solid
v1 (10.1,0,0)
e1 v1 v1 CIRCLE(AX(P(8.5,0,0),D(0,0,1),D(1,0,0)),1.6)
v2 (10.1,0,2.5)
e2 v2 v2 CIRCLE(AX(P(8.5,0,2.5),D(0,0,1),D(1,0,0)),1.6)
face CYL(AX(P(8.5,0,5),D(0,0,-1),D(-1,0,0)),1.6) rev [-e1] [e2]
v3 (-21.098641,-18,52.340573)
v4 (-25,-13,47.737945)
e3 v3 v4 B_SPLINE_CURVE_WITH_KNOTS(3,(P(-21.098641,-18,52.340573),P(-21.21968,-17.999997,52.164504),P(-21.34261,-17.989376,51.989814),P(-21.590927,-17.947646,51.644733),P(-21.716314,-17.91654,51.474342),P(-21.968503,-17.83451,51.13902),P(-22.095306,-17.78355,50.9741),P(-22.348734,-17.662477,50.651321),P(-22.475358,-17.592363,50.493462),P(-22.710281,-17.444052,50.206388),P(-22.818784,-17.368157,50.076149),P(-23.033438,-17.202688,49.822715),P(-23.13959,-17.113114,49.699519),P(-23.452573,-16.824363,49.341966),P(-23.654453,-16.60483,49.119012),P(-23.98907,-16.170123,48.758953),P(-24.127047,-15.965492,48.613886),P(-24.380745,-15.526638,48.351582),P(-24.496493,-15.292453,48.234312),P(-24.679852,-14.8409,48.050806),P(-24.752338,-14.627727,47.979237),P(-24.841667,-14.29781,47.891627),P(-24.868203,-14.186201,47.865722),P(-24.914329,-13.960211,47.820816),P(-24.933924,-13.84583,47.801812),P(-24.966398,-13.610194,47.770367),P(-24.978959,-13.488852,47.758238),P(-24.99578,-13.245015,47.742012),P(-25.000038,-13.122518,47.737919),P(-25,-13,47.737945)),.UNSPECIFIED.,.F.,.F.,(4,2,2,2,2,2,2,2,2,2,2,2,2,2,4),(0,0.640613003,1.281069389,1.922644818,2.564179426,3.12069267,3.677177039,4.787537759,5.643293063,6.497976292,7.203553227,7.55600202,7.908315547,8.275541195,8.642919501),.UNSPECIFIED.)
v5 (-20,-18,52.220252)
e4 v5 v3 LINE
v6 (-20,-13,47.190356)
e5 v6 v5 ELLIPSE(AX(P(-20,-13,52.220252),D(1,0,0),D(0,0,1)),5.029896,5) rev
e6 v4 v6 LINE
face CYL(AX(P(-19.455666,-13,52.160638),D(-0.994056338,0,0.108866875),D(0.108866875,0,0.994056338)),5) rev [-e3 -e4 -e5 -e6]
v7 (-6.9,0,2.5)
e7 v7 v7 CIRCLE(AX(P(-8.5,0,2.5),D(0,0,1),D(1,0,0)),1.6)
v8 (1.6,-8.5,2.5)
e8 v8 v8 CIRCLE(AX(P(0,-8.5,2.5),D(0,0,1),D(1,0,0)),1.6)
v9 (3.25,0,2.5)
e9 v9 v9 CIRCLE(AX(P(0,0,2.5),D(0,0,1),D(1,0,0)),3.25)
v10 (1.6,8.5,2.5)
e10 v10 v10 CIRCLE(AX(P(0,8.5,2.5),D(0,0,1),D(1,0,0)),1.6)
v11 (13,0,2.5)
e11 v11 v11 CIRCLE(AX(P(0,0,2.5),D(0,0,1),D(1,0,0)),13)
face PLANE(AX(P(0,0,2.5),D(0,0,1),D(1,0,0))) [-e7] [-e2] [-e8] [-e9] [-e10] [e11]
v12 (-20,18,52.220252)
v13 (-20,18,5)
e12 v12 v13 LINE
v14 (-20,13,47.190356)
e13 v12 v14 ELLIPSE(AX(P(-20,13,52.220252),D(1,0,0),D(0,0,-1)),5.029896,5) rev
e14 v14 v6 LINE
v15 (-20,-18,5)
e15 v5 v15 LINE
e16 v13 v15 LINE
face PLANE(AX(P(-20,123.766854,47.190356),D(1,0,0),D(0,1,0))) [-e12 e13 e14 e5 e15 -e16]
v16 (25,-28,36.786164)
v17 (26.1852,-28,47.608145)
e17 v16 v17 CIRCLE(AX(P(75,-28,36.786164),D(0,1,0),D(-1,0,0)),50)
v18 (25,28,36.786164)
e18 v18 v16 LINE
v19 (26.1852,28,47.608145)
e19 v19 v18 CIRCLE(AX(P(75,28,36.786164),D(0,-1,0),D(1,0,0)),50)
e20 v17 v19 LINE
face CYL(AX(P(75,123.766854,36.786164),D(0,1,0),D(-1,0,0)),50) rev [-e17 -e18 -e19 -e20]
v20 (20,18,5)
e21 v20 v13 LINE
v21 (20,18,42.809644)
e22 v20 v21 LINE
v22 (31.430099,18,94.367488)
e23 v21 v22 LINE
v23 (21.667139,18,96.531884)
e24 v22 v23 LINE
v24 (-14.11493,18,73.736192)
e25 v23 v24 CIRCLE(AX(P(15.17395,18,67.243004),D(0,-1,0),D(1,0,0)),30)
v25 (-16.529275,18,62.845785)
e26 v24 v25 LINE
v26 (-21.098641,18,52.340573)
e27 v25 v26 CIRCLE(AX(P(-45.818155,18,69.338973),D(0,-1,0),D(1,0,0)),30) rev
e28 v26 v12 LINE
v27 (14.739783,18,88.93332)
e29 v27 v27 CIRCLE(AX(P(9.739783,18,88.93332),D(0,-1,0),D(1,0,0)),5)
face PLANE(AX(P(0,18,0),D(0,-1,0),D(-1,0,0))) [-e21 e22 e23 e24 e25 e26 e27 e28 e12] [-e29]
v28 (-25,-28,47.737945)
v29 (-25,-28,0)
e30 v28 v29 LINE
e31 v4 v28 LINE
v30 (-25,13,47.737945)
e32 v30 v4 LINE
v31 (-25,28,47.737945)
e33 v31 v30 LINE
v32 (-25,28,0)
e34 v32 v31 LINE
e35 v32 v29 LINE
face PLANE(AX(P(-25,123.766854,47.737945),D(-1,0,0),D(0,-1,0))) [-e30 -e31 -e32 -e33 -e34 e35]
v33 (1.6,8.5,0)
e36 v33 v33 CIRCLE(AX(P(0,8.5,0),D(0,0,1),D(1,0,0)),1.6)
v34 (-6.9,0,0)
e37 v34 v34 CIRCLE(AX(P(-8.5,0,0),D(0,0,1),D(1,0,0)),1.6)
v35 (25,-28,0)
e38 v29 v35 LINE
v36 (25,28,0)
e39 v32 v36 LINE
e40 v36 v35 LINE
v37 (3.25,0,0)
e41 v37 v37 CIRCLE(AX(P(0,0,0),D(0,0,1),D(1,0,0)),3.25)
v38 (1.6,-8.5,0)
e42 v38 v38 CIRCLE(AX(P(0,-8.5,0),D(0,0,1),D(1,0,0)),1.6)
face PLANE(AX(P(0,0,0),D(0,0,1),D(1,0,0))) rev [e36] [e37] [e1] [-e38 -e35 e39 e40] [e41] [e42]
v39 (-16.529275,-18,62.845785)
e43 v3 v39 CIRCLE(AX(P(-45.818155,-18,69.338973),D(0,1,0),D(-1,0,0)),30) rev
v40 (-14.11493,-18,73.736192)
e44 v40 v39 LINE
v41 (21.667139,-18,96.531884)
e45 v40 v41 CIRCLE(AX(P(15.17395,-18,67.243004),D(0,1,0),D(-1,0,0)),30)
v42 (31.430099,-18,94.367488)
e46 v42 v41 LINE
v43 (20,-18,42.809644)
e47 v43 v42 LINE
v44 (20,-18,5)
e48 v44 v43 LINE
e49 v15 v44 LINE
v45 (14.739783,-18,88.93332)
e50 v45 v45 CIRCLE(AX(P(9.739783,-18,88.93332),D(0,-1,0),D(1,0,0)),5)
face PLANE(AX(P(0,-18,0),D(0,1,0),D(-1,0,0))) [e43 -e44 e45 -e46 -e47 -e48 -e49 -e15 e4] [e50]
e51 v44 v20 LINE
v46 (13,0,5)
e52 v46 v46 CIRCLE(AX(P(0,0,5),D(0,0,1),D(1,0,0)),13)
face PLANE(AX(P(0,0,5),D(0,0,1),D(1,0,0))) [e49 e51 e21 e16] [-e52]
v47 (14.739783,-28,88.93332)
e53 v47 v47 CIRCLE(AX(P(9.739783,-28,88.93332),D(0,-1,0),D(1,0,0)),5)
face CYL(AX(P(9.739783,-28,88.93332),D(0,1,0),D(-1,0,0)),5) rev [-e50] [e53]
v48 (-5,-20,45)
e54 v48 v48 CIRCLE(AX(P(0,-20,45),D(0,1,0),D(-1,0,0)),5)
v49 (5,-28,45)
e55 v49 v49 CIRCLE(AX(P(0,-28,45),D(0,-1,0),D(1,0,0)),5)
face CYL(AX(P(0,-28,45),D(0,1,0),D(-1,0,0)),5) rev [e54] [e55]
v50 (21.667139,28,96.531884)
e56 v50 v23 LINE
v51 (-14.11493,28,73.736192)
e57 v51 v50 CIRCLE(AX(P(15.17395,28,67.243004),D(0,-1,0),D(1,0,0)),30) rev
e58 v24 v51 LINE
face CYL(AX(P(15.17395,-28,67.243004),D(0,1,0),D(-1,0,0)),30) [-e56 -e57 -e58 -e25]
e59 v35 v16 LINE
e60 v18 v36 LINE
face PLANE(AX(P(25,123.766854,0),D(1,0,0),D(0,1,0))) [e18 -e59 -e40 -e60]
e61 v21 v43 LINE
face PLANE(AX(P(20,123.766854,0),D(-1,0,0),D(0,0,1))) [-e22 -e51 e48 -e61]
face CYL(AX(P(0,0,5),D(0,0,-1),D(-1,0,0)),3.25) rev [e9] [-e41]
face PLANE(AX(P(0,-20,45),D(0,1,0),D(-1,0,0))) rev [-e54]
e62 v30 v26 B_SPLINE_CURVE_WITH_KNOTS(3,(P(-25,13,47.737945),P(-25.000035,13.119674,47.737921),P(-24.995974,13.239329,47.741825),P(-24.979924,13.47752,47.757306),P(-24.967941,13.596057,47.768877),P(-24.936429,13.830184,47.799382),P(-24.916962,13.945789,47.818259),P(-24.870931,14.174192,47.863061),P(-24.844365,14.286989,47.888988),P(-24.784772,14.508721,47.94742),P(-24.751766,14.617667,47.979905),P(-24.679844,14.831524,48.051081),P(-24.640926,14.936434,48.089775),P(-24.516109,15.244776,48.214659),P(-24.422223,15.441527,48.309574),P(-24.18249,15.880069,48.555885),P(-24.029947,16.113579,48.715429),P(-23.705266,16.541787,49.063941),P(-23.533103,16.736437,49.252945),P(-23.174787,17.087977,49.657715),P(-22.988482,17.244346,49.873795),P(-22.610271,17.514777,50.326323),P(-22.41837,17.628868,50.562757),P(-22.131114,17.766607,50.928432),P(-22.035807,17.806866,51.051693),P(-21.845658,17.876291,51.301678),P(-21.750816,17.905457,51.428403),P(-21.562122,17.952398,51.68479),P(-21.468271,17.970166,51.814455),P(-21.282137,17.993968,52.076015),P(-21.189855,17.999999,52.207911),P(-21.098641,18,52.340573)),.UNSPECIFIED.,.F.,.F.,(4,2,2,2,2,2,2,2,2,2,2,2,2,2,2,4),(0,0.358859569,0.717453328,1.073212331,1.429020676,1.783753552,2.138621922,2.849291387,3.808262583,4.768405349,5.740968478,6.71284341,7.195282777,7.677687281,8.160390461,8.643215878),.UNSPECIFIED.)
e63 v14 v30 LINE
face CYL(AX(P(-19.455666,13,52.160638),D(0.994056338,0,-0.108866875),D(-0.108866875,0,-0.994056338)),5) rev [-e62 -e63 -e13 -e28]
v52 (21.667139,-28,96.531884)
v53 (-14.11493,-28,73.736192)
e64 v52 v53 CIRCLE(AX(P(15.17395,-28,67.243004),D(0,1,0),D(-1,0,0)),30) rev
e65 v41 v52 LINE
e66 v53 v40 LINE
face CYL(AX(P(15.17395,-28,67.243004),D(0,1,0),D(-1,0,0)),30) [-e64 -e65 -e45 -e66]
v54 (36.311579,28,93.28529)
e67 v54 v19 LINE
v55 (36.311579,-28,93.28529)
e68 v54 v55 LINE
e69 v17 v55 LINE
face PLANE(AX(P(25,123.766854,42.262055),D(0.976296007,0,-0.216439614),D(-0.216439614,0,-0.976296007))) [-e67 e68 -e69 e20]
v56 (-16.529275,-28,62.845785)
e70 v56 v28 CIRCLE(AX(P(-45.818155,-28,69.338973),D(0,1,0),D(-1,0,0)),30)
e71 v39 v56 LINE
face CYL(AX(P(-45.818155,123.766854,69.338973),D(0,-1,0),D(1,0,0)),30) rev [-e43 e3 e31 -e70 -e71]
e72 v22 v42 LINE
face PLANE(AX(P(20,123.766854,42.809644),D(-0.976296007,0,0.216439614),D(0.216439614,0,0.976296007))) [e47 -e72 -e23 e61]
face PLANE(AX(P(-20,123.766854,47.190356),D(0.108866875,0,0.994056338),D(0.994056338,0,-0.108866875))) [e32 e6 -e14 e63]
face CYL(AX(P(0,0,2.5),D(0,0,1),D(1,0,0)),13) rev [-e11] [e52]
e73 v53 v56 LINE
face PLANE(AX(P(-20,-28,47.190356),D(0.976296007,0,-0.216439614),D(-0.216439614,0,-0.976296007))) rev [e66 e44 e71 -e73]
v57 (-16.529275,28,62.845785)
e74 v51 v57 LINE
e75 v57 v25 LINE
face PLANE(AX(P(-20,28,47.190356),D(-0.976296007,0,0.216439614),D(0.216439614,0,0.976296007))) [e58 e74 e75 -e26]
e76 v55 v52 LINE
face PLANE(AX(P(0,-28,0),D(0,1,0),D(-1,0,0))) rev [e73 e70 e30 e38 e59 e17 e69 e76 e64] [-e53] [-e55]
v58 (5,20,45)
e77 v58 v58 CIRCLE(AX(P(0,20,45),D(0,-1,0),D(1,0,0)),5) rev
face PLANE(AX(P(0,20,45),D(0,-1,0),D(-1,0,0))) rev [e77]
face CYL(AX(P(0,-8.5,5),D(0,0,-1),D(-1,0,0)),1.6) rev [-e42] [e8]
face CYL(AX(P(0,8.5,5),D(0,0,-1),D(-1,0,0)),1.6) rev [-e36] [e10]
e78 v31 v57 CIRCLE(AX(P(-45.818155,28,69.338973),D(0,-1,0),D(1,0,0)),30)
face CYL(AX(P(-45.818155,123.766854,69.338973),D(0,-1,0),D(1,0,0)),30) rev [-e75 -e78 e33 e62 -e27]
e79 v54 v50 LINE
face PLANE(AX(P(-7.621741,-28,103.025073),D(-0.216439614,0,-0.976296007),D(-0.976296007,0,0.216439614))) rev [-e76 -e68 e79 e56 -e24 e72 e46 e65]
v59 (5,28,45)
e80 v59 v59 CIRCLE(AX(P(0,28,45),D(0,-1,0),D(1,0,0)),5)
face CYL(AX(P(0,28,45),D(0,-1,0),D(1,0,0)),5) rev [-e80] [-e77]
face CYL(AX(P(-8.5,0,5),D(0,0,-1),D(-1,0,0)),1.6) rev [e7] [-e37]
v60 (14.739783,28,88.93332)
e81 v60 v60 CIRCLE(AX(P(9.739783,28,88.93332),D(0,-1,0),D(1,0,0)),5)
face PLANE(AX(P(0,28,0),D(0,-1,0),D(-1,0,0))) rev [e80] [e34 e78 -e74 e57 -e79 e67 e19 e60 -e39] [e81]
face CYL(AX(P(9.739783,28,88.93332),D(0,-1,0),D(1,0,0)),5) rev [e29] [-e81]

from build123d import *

# Parameters (mm, degrees)
SKETCH_1_W          = 40
SKETCH_1_H          = 36
SKETCH_1_R          = 1.6
SKETCH_1_R_2        = 3.25
EXTRUDE_1_DEPTH     = 5
SKETCH_2_R          = 13
CUT_EXTRUDE_1_DEPTH = 2.5
SKETCH_7_R          = 5
EXTRUDE_2_DEPTH     = 10
SKETCH_10_R         = 5
EXTRUDE_4_DEPTH     = 2
EXTRUDE_3_REACH     = 123.4
FILLET_1_R          = 30
FILLET_2_R          = 50
FILLET_6_R          = 5


with BuildPart() as part:
    # ｽｹｯﾁ1 → ﾎﾞｽ - 押し出し1 (new body)
    with BuildSketch(Plane.XY):
        Rectangle(SKETCH_1_W, SKETCH_1_H)
        with Locations((0, 8.5)):
            Circle(SKETCH_1_R, mode=Mode.SUBTRACT)
        with Locations((8.5, 0)):
            Circle(SKETCH_1_R, mode=Mode.SUBTRACT)
        with Locations((0, -8.5)):
            Circle(SKETCH_1_R, mode=Mode.SUBTRACT)
        with Locations((-8.5, 0)):
            Circle(SKETCH_1_R, mode=Mode.SUBTRACT)
        Circle(SKETCH_1_R_2, mode=Mode.SUBTRACT)
    extrude(amount=EXTRUDE_1_DEPTH)

    # ｽｹｯﾁ2 → ｶｯﾄ - 押し出し1 (cut)
    with BuildSketch(Plane.XY.offset(5)):
        Circle(SKETCH_2_R)
    extrude(amount=-CUT_EXTRUDE_1_DEPTH, mode=Mode.SUBTRACT)

    # ｽｹｯﾁ7 → ﾎﾞｽ - 押し出し2 (add)
    with BuildSketch(Plane.XZ.offset(18)):
        Polygon((-20, 0), (-20, 47.190356234), (-7.621741376, 103.02507267), (31.430098909, 94.367488113), (20, 42.809643766), (20, 0), align=None)
        with Locations((0, 45)):
            Circle(SKETCH_7_R, mode=Mode.SUBTRACT)
        with Locations((9.739782627, 88.93332032)):
            Circle(SKETCH_7_R, mode=Mode.SUBTRACT)
    extrude_2 = extrude(amount=EXTRUDE_2_DEPTH)

    # ｽｹｯﾁ10 → ﾎﾞｽ - 押し出し4 (add)
    with BuildSketch(Plane(origin=(0, -18, 0), x_dir=(1, 0, 0), z_dir=(0, 1, 0))):
        with Locations(Location((0, -45, 0), (0, 0, 180))):
            Circle(SKETCH_10_R)
    extrude_4 = extrude(amount=-EXTRUDE_4_DEPTH)

    # ﾐﾗｰ3: ﾎﾞｽ - 押し出し2, ﾎﾞｽ - 押し出し4 across plane
    add(extrude_2.mirror(Plane.ZX))
    add(extrude_4.mirror(Plane.ZX))

    # ﾎﾞｽ - 押し出し3: up to this face of the body (flat: up to its plane)
    extrude_3_end = Plane(part.part.faces().sort_by_distance((-18.848513106, 28, 23.595178117))[0])
    # ｽｹｯﾁ8 → ﾎﾞｽ - 押し出し3 (add, up to the picked face)
    with BuildSketch(Plane.XZ.offset(28), mode=Mode.PRIVATE) as extrude_3_sk1:
        Polygon((-20, 47.190356234), (-20, 0), (-25, 0), (-25, 47.737945292), align=None)
    extrude_3_tool1 = split(extrude(extrude_3_sk1.sketch, amount=-EXTRUDE_3_REACH, mode=Mode.PRIVATE), bisect_by=extrude_3_end, keep=Keep.BOTH, mode=Mode.PRIVATE)
    # ｽｹｯﾁ8 → ﾎﾞｽ - 押し出し3 (add, up to the picked face)
    with BuildSketch(Plane.XZ.offset(28), mode=Mode.PRIVATE) as extrude_3_sk2:
        Polygon((20, 42.809643766), (31.430098909, 94.367488113), (36.311578945, 93.285290043), (25, 42.262054708), (25, 0), (20, 0), align=None)
    extrude_3_tool2 = split(extrude(extrude_3_sk2.sketch, amount=-EXTRUDE_3_REACH, mode=Mode.PRIVATE), bisect_by=extrude_3_end, keep=Keep.BOTH, mode=Mode.PRIVATE)
    add(extrude_3_tool1.solids().sort_by(Axis((-22.504807, -28, 23.732339), (0, 1, 0)))[0])
    add(extrude_3_tool2.solids().sort_by(Axis((25.636945, -28, 47.192298), (0, 1, 0)))[0])

    # ﾌｨﾚｯﾄ1
    # the kernel refuses this fillet: 30 mm, written as the material it adds along each edge
    with BuildSketch(Plane(origin=(-20, 22.088837233, 47.190356234), x_dir=(0.2164396139380964, 0, 0.9762960071199349), z_dir=(0, -1, 0))) as fillet_1_piece_1_section:
        with BuildLine():
            CenterArc((16.035534893, 30), FILLET_1_R, 236.442690238, 33.557309762)
            Line((-0.547589058, 5), (0, 0))
            Line((0, 0), (16.035534893, 0))
        make_face()
    fillet_1_piece_1 = extrude(amount=90.177674467, mode=Mode.PRIVATE)
    fillet_1_piece_1 = split(fillet_1_piece_1, bisect_by=Plane(origin=(-20, 18, 47.190356234), z_dir=(0, 1, 0)), keep=Keep.TOP, mode=Mode.PRIVATE)
    add(fillet_1_piece_1)
    with BuildSketch(Plane(origin=(-20, -18, 47.190356234), x_dir=(0.2164396139380964, 0, 0.9762960071199349), z_dir=(0, -1, 0))) as fillet_1_piece_2:
        with BuildLine():
            CenterArc((16.035534893, 30), FILLET_1_R, 236.442690238, 33.557309762)
            Line((-0.547589058, 5), (0, 0))
            Line((0, 0), (16.035534893, 0))
        make_face()
    extrude(amount=10)
    with BuildSketch(Plane(origin=(-20, -22.088837233, 47.190356234), x_dir=(-0.9940563382222736, 0, 0.10886687485238501), z_dir=(0, 1, 0))) as fillet_1_piece_3_section:
        with BuildLine():
            CenterArc((28.075951576, 19.206231343), FILLET_1_R, 186.25, 33.557309762)
            Line((-1.74573857, 15.940225098), (0, 0))
            Line((0, 0), (5.029896001, 0))
        make_face()
    fillet_1_piece_3 = extrude(amount=90.177674467, mode=Mode.PRIVATE)
    fillet_1_piece_3 = split(fillet_1_piece_3, bisect_by=Plane(origin=(-20, -18, 47.190356234), z_dir=(0, -1, 0)), keep=Keep.TOP, mode=Mode.PRIVATE)
    add(fillet_1_piece_3)
    with BuildSketch(Plane(origin=(-20, 18, 47.190356234), x_dir=(-0.9940563382222736, 0, 0.10886687485238501), z_dir=(0, 1, 0))) as fillet_1_piece_4:
        with BuildLine():
            CenterArc((28.075951576, 19.206231343), FILLET_1_R, 186.25, 33.557309762)
            Line((-1.74573857, 15.940225098), (0, 0))
            Line((0, 0), (5.029896001, 0))
        make_face()
    extrude(amount=10)
    # the kernel refuses this fillet: 30 mm, written as the material it takes off along each edge
    with BuildSketch(Plane(origin=(-7.621741376, 57, 103.02507267), x_dir=(0.9762960071199346, 0, -0.21643961393809735), z_dir=(0, -1, 0))) as fillet_1_2_piece_1:
        with BuildLine():
            CenterArc((FILLET_1_R, -FILLET_1_R), FILLET_1_R, 90, 90)
            Line((0, -FILLET_1_R), (0, 0))
            Line((0, 0), (FILLET_1_R, 0))
        make_face()
    extrude(amount=160, mode=Mode.SUBTRACT)
    with BuildSketch(Plane(origin=(-7.621741376, -57, 103.02507267), x_dir=(0.9762960071199348, 0, -0.21643961393809644), z_dir=(0, 1, 0))) as fillet_1_2_piece_2:
        with BuildLine():
            CenterArc((FILLET_1_R, FILLET_1_R), FILLET_1_R, 180, 90)
            Line((0, FILLET_1_R), (0, 0))
            Line((0, 0), (FILLET_1_R, 0))
        make_face()
    extrude(amount=160, mode=Mode.SUBTRACT)

    # ﾌｨﾚｯﾄ2
    fillet_2_edges = [part.edges().sort_by_distance(p)[0] for p in [
        (25, 0, 42.262054708),
    ]]
    fillet(fillet_2_edges, radius=FILLET_2_R)

    # ﾌｨﾚｯﾄ6
    # the kernel refuses this fillet: 5 mm, written as the material it adds along each edge
    with BuildSketch(Plane(origin=(-7.574295772, 18, 45.829520298), x_dir=(0.10886687485234858, 0, 0.9940563382222776), z_dir=(-0.9940563382222776, 0, 0.1088668748523486))) as fillet_6_piece_1_section:
        with BuildLine():
            CenterArc((FILLET_6_R, -FILLET_6_R), FILLET_6_R, 90, 90)
            Line((0, -FILLET_6_R), (0, 0))
            Line((0, 0), (FILLET_6_R, 0))
        make_face()
    fillet_6_piece_1 = extrude(amount=30.029896001, mode=Mode.PRIVATE)
    fillet_6_piece_1 = split(fillet_6_piece_1, bisect_by=Plane(origin=(-25, 18, 45.829520298), z_dir=(1, 0, 0)), keep=Keep.TOP, mode=Mode.PRIVATE)
    fillet_6_piece_1 = fillet_6_piece_1 - Plane(origin=(-45.818155232, 18, 69.33897334), x_dir=(-0.9940563382223121, 0, 0.10886687485203418), z_dir=(0, -1, 0)) * Cylinder(30, 81, mode=Mode.PRIVATE)
    fillet_6_piece_1 = split(fillet_6_piece_1, bisect_by=Plane(origin=(-20, 18, 45.829520298), z_dir=(-1, 0, 0)), keep=Keep.TOP, mode=Mode.PRIVATE)
    add(fillet_6_piece_1)
    with BuildSketch(Plane(origin=(-37.425704228, -18, 49.098781228), x_dir=(0.10886687485234857, 0, 0.9940563382222776), z_dir=(0.9940563382222777, 0, -0.10886687485234858))) as fillet_6_piece_2_section:
        with BuildLine():
            CenterArc((FILLET_6_R, -FILLET_6_R), FILLET_6_R, 90, 90)
            Line((0, -FILLET_6_R), (0, 0))
            Line((0, 0), (FILLET_6_R, 0))
        make_face()
    fillet_6_piece_2 = extrude(amount=30.029896001, mode=Mode.PRIVATE)
    fillet_6_piece_2 = split(fillet_6_piece_2, bisect_by=Plane(origin=(-25, -18, 49.098781228), z_dir=(1, 0, 0)), keep=Keep.TOP, mode=Mode.PRIVATE)
    fillet_6_piece_2 = split(fillet_6_piece_2, bisect_by=Plane(origin=(-20, -18, 49.098781228), z_dir=(-1, 0, 0)), keep=Keep.TOP, mode=Mode.PRIVATE)
    fillet_6_piece_2 = fillet_6_piece_2 - Plane(origin=(-45.818155232, -18, 69.33897334), x_dir=(0.21643961393799077, 0, 0.9762960071199583), z_dir=(0, 1, 0)) * Cylinder(30, 81, mode=Mode.PRIVATE)
    add(fillet_6_piece_2)


solid = part.part
